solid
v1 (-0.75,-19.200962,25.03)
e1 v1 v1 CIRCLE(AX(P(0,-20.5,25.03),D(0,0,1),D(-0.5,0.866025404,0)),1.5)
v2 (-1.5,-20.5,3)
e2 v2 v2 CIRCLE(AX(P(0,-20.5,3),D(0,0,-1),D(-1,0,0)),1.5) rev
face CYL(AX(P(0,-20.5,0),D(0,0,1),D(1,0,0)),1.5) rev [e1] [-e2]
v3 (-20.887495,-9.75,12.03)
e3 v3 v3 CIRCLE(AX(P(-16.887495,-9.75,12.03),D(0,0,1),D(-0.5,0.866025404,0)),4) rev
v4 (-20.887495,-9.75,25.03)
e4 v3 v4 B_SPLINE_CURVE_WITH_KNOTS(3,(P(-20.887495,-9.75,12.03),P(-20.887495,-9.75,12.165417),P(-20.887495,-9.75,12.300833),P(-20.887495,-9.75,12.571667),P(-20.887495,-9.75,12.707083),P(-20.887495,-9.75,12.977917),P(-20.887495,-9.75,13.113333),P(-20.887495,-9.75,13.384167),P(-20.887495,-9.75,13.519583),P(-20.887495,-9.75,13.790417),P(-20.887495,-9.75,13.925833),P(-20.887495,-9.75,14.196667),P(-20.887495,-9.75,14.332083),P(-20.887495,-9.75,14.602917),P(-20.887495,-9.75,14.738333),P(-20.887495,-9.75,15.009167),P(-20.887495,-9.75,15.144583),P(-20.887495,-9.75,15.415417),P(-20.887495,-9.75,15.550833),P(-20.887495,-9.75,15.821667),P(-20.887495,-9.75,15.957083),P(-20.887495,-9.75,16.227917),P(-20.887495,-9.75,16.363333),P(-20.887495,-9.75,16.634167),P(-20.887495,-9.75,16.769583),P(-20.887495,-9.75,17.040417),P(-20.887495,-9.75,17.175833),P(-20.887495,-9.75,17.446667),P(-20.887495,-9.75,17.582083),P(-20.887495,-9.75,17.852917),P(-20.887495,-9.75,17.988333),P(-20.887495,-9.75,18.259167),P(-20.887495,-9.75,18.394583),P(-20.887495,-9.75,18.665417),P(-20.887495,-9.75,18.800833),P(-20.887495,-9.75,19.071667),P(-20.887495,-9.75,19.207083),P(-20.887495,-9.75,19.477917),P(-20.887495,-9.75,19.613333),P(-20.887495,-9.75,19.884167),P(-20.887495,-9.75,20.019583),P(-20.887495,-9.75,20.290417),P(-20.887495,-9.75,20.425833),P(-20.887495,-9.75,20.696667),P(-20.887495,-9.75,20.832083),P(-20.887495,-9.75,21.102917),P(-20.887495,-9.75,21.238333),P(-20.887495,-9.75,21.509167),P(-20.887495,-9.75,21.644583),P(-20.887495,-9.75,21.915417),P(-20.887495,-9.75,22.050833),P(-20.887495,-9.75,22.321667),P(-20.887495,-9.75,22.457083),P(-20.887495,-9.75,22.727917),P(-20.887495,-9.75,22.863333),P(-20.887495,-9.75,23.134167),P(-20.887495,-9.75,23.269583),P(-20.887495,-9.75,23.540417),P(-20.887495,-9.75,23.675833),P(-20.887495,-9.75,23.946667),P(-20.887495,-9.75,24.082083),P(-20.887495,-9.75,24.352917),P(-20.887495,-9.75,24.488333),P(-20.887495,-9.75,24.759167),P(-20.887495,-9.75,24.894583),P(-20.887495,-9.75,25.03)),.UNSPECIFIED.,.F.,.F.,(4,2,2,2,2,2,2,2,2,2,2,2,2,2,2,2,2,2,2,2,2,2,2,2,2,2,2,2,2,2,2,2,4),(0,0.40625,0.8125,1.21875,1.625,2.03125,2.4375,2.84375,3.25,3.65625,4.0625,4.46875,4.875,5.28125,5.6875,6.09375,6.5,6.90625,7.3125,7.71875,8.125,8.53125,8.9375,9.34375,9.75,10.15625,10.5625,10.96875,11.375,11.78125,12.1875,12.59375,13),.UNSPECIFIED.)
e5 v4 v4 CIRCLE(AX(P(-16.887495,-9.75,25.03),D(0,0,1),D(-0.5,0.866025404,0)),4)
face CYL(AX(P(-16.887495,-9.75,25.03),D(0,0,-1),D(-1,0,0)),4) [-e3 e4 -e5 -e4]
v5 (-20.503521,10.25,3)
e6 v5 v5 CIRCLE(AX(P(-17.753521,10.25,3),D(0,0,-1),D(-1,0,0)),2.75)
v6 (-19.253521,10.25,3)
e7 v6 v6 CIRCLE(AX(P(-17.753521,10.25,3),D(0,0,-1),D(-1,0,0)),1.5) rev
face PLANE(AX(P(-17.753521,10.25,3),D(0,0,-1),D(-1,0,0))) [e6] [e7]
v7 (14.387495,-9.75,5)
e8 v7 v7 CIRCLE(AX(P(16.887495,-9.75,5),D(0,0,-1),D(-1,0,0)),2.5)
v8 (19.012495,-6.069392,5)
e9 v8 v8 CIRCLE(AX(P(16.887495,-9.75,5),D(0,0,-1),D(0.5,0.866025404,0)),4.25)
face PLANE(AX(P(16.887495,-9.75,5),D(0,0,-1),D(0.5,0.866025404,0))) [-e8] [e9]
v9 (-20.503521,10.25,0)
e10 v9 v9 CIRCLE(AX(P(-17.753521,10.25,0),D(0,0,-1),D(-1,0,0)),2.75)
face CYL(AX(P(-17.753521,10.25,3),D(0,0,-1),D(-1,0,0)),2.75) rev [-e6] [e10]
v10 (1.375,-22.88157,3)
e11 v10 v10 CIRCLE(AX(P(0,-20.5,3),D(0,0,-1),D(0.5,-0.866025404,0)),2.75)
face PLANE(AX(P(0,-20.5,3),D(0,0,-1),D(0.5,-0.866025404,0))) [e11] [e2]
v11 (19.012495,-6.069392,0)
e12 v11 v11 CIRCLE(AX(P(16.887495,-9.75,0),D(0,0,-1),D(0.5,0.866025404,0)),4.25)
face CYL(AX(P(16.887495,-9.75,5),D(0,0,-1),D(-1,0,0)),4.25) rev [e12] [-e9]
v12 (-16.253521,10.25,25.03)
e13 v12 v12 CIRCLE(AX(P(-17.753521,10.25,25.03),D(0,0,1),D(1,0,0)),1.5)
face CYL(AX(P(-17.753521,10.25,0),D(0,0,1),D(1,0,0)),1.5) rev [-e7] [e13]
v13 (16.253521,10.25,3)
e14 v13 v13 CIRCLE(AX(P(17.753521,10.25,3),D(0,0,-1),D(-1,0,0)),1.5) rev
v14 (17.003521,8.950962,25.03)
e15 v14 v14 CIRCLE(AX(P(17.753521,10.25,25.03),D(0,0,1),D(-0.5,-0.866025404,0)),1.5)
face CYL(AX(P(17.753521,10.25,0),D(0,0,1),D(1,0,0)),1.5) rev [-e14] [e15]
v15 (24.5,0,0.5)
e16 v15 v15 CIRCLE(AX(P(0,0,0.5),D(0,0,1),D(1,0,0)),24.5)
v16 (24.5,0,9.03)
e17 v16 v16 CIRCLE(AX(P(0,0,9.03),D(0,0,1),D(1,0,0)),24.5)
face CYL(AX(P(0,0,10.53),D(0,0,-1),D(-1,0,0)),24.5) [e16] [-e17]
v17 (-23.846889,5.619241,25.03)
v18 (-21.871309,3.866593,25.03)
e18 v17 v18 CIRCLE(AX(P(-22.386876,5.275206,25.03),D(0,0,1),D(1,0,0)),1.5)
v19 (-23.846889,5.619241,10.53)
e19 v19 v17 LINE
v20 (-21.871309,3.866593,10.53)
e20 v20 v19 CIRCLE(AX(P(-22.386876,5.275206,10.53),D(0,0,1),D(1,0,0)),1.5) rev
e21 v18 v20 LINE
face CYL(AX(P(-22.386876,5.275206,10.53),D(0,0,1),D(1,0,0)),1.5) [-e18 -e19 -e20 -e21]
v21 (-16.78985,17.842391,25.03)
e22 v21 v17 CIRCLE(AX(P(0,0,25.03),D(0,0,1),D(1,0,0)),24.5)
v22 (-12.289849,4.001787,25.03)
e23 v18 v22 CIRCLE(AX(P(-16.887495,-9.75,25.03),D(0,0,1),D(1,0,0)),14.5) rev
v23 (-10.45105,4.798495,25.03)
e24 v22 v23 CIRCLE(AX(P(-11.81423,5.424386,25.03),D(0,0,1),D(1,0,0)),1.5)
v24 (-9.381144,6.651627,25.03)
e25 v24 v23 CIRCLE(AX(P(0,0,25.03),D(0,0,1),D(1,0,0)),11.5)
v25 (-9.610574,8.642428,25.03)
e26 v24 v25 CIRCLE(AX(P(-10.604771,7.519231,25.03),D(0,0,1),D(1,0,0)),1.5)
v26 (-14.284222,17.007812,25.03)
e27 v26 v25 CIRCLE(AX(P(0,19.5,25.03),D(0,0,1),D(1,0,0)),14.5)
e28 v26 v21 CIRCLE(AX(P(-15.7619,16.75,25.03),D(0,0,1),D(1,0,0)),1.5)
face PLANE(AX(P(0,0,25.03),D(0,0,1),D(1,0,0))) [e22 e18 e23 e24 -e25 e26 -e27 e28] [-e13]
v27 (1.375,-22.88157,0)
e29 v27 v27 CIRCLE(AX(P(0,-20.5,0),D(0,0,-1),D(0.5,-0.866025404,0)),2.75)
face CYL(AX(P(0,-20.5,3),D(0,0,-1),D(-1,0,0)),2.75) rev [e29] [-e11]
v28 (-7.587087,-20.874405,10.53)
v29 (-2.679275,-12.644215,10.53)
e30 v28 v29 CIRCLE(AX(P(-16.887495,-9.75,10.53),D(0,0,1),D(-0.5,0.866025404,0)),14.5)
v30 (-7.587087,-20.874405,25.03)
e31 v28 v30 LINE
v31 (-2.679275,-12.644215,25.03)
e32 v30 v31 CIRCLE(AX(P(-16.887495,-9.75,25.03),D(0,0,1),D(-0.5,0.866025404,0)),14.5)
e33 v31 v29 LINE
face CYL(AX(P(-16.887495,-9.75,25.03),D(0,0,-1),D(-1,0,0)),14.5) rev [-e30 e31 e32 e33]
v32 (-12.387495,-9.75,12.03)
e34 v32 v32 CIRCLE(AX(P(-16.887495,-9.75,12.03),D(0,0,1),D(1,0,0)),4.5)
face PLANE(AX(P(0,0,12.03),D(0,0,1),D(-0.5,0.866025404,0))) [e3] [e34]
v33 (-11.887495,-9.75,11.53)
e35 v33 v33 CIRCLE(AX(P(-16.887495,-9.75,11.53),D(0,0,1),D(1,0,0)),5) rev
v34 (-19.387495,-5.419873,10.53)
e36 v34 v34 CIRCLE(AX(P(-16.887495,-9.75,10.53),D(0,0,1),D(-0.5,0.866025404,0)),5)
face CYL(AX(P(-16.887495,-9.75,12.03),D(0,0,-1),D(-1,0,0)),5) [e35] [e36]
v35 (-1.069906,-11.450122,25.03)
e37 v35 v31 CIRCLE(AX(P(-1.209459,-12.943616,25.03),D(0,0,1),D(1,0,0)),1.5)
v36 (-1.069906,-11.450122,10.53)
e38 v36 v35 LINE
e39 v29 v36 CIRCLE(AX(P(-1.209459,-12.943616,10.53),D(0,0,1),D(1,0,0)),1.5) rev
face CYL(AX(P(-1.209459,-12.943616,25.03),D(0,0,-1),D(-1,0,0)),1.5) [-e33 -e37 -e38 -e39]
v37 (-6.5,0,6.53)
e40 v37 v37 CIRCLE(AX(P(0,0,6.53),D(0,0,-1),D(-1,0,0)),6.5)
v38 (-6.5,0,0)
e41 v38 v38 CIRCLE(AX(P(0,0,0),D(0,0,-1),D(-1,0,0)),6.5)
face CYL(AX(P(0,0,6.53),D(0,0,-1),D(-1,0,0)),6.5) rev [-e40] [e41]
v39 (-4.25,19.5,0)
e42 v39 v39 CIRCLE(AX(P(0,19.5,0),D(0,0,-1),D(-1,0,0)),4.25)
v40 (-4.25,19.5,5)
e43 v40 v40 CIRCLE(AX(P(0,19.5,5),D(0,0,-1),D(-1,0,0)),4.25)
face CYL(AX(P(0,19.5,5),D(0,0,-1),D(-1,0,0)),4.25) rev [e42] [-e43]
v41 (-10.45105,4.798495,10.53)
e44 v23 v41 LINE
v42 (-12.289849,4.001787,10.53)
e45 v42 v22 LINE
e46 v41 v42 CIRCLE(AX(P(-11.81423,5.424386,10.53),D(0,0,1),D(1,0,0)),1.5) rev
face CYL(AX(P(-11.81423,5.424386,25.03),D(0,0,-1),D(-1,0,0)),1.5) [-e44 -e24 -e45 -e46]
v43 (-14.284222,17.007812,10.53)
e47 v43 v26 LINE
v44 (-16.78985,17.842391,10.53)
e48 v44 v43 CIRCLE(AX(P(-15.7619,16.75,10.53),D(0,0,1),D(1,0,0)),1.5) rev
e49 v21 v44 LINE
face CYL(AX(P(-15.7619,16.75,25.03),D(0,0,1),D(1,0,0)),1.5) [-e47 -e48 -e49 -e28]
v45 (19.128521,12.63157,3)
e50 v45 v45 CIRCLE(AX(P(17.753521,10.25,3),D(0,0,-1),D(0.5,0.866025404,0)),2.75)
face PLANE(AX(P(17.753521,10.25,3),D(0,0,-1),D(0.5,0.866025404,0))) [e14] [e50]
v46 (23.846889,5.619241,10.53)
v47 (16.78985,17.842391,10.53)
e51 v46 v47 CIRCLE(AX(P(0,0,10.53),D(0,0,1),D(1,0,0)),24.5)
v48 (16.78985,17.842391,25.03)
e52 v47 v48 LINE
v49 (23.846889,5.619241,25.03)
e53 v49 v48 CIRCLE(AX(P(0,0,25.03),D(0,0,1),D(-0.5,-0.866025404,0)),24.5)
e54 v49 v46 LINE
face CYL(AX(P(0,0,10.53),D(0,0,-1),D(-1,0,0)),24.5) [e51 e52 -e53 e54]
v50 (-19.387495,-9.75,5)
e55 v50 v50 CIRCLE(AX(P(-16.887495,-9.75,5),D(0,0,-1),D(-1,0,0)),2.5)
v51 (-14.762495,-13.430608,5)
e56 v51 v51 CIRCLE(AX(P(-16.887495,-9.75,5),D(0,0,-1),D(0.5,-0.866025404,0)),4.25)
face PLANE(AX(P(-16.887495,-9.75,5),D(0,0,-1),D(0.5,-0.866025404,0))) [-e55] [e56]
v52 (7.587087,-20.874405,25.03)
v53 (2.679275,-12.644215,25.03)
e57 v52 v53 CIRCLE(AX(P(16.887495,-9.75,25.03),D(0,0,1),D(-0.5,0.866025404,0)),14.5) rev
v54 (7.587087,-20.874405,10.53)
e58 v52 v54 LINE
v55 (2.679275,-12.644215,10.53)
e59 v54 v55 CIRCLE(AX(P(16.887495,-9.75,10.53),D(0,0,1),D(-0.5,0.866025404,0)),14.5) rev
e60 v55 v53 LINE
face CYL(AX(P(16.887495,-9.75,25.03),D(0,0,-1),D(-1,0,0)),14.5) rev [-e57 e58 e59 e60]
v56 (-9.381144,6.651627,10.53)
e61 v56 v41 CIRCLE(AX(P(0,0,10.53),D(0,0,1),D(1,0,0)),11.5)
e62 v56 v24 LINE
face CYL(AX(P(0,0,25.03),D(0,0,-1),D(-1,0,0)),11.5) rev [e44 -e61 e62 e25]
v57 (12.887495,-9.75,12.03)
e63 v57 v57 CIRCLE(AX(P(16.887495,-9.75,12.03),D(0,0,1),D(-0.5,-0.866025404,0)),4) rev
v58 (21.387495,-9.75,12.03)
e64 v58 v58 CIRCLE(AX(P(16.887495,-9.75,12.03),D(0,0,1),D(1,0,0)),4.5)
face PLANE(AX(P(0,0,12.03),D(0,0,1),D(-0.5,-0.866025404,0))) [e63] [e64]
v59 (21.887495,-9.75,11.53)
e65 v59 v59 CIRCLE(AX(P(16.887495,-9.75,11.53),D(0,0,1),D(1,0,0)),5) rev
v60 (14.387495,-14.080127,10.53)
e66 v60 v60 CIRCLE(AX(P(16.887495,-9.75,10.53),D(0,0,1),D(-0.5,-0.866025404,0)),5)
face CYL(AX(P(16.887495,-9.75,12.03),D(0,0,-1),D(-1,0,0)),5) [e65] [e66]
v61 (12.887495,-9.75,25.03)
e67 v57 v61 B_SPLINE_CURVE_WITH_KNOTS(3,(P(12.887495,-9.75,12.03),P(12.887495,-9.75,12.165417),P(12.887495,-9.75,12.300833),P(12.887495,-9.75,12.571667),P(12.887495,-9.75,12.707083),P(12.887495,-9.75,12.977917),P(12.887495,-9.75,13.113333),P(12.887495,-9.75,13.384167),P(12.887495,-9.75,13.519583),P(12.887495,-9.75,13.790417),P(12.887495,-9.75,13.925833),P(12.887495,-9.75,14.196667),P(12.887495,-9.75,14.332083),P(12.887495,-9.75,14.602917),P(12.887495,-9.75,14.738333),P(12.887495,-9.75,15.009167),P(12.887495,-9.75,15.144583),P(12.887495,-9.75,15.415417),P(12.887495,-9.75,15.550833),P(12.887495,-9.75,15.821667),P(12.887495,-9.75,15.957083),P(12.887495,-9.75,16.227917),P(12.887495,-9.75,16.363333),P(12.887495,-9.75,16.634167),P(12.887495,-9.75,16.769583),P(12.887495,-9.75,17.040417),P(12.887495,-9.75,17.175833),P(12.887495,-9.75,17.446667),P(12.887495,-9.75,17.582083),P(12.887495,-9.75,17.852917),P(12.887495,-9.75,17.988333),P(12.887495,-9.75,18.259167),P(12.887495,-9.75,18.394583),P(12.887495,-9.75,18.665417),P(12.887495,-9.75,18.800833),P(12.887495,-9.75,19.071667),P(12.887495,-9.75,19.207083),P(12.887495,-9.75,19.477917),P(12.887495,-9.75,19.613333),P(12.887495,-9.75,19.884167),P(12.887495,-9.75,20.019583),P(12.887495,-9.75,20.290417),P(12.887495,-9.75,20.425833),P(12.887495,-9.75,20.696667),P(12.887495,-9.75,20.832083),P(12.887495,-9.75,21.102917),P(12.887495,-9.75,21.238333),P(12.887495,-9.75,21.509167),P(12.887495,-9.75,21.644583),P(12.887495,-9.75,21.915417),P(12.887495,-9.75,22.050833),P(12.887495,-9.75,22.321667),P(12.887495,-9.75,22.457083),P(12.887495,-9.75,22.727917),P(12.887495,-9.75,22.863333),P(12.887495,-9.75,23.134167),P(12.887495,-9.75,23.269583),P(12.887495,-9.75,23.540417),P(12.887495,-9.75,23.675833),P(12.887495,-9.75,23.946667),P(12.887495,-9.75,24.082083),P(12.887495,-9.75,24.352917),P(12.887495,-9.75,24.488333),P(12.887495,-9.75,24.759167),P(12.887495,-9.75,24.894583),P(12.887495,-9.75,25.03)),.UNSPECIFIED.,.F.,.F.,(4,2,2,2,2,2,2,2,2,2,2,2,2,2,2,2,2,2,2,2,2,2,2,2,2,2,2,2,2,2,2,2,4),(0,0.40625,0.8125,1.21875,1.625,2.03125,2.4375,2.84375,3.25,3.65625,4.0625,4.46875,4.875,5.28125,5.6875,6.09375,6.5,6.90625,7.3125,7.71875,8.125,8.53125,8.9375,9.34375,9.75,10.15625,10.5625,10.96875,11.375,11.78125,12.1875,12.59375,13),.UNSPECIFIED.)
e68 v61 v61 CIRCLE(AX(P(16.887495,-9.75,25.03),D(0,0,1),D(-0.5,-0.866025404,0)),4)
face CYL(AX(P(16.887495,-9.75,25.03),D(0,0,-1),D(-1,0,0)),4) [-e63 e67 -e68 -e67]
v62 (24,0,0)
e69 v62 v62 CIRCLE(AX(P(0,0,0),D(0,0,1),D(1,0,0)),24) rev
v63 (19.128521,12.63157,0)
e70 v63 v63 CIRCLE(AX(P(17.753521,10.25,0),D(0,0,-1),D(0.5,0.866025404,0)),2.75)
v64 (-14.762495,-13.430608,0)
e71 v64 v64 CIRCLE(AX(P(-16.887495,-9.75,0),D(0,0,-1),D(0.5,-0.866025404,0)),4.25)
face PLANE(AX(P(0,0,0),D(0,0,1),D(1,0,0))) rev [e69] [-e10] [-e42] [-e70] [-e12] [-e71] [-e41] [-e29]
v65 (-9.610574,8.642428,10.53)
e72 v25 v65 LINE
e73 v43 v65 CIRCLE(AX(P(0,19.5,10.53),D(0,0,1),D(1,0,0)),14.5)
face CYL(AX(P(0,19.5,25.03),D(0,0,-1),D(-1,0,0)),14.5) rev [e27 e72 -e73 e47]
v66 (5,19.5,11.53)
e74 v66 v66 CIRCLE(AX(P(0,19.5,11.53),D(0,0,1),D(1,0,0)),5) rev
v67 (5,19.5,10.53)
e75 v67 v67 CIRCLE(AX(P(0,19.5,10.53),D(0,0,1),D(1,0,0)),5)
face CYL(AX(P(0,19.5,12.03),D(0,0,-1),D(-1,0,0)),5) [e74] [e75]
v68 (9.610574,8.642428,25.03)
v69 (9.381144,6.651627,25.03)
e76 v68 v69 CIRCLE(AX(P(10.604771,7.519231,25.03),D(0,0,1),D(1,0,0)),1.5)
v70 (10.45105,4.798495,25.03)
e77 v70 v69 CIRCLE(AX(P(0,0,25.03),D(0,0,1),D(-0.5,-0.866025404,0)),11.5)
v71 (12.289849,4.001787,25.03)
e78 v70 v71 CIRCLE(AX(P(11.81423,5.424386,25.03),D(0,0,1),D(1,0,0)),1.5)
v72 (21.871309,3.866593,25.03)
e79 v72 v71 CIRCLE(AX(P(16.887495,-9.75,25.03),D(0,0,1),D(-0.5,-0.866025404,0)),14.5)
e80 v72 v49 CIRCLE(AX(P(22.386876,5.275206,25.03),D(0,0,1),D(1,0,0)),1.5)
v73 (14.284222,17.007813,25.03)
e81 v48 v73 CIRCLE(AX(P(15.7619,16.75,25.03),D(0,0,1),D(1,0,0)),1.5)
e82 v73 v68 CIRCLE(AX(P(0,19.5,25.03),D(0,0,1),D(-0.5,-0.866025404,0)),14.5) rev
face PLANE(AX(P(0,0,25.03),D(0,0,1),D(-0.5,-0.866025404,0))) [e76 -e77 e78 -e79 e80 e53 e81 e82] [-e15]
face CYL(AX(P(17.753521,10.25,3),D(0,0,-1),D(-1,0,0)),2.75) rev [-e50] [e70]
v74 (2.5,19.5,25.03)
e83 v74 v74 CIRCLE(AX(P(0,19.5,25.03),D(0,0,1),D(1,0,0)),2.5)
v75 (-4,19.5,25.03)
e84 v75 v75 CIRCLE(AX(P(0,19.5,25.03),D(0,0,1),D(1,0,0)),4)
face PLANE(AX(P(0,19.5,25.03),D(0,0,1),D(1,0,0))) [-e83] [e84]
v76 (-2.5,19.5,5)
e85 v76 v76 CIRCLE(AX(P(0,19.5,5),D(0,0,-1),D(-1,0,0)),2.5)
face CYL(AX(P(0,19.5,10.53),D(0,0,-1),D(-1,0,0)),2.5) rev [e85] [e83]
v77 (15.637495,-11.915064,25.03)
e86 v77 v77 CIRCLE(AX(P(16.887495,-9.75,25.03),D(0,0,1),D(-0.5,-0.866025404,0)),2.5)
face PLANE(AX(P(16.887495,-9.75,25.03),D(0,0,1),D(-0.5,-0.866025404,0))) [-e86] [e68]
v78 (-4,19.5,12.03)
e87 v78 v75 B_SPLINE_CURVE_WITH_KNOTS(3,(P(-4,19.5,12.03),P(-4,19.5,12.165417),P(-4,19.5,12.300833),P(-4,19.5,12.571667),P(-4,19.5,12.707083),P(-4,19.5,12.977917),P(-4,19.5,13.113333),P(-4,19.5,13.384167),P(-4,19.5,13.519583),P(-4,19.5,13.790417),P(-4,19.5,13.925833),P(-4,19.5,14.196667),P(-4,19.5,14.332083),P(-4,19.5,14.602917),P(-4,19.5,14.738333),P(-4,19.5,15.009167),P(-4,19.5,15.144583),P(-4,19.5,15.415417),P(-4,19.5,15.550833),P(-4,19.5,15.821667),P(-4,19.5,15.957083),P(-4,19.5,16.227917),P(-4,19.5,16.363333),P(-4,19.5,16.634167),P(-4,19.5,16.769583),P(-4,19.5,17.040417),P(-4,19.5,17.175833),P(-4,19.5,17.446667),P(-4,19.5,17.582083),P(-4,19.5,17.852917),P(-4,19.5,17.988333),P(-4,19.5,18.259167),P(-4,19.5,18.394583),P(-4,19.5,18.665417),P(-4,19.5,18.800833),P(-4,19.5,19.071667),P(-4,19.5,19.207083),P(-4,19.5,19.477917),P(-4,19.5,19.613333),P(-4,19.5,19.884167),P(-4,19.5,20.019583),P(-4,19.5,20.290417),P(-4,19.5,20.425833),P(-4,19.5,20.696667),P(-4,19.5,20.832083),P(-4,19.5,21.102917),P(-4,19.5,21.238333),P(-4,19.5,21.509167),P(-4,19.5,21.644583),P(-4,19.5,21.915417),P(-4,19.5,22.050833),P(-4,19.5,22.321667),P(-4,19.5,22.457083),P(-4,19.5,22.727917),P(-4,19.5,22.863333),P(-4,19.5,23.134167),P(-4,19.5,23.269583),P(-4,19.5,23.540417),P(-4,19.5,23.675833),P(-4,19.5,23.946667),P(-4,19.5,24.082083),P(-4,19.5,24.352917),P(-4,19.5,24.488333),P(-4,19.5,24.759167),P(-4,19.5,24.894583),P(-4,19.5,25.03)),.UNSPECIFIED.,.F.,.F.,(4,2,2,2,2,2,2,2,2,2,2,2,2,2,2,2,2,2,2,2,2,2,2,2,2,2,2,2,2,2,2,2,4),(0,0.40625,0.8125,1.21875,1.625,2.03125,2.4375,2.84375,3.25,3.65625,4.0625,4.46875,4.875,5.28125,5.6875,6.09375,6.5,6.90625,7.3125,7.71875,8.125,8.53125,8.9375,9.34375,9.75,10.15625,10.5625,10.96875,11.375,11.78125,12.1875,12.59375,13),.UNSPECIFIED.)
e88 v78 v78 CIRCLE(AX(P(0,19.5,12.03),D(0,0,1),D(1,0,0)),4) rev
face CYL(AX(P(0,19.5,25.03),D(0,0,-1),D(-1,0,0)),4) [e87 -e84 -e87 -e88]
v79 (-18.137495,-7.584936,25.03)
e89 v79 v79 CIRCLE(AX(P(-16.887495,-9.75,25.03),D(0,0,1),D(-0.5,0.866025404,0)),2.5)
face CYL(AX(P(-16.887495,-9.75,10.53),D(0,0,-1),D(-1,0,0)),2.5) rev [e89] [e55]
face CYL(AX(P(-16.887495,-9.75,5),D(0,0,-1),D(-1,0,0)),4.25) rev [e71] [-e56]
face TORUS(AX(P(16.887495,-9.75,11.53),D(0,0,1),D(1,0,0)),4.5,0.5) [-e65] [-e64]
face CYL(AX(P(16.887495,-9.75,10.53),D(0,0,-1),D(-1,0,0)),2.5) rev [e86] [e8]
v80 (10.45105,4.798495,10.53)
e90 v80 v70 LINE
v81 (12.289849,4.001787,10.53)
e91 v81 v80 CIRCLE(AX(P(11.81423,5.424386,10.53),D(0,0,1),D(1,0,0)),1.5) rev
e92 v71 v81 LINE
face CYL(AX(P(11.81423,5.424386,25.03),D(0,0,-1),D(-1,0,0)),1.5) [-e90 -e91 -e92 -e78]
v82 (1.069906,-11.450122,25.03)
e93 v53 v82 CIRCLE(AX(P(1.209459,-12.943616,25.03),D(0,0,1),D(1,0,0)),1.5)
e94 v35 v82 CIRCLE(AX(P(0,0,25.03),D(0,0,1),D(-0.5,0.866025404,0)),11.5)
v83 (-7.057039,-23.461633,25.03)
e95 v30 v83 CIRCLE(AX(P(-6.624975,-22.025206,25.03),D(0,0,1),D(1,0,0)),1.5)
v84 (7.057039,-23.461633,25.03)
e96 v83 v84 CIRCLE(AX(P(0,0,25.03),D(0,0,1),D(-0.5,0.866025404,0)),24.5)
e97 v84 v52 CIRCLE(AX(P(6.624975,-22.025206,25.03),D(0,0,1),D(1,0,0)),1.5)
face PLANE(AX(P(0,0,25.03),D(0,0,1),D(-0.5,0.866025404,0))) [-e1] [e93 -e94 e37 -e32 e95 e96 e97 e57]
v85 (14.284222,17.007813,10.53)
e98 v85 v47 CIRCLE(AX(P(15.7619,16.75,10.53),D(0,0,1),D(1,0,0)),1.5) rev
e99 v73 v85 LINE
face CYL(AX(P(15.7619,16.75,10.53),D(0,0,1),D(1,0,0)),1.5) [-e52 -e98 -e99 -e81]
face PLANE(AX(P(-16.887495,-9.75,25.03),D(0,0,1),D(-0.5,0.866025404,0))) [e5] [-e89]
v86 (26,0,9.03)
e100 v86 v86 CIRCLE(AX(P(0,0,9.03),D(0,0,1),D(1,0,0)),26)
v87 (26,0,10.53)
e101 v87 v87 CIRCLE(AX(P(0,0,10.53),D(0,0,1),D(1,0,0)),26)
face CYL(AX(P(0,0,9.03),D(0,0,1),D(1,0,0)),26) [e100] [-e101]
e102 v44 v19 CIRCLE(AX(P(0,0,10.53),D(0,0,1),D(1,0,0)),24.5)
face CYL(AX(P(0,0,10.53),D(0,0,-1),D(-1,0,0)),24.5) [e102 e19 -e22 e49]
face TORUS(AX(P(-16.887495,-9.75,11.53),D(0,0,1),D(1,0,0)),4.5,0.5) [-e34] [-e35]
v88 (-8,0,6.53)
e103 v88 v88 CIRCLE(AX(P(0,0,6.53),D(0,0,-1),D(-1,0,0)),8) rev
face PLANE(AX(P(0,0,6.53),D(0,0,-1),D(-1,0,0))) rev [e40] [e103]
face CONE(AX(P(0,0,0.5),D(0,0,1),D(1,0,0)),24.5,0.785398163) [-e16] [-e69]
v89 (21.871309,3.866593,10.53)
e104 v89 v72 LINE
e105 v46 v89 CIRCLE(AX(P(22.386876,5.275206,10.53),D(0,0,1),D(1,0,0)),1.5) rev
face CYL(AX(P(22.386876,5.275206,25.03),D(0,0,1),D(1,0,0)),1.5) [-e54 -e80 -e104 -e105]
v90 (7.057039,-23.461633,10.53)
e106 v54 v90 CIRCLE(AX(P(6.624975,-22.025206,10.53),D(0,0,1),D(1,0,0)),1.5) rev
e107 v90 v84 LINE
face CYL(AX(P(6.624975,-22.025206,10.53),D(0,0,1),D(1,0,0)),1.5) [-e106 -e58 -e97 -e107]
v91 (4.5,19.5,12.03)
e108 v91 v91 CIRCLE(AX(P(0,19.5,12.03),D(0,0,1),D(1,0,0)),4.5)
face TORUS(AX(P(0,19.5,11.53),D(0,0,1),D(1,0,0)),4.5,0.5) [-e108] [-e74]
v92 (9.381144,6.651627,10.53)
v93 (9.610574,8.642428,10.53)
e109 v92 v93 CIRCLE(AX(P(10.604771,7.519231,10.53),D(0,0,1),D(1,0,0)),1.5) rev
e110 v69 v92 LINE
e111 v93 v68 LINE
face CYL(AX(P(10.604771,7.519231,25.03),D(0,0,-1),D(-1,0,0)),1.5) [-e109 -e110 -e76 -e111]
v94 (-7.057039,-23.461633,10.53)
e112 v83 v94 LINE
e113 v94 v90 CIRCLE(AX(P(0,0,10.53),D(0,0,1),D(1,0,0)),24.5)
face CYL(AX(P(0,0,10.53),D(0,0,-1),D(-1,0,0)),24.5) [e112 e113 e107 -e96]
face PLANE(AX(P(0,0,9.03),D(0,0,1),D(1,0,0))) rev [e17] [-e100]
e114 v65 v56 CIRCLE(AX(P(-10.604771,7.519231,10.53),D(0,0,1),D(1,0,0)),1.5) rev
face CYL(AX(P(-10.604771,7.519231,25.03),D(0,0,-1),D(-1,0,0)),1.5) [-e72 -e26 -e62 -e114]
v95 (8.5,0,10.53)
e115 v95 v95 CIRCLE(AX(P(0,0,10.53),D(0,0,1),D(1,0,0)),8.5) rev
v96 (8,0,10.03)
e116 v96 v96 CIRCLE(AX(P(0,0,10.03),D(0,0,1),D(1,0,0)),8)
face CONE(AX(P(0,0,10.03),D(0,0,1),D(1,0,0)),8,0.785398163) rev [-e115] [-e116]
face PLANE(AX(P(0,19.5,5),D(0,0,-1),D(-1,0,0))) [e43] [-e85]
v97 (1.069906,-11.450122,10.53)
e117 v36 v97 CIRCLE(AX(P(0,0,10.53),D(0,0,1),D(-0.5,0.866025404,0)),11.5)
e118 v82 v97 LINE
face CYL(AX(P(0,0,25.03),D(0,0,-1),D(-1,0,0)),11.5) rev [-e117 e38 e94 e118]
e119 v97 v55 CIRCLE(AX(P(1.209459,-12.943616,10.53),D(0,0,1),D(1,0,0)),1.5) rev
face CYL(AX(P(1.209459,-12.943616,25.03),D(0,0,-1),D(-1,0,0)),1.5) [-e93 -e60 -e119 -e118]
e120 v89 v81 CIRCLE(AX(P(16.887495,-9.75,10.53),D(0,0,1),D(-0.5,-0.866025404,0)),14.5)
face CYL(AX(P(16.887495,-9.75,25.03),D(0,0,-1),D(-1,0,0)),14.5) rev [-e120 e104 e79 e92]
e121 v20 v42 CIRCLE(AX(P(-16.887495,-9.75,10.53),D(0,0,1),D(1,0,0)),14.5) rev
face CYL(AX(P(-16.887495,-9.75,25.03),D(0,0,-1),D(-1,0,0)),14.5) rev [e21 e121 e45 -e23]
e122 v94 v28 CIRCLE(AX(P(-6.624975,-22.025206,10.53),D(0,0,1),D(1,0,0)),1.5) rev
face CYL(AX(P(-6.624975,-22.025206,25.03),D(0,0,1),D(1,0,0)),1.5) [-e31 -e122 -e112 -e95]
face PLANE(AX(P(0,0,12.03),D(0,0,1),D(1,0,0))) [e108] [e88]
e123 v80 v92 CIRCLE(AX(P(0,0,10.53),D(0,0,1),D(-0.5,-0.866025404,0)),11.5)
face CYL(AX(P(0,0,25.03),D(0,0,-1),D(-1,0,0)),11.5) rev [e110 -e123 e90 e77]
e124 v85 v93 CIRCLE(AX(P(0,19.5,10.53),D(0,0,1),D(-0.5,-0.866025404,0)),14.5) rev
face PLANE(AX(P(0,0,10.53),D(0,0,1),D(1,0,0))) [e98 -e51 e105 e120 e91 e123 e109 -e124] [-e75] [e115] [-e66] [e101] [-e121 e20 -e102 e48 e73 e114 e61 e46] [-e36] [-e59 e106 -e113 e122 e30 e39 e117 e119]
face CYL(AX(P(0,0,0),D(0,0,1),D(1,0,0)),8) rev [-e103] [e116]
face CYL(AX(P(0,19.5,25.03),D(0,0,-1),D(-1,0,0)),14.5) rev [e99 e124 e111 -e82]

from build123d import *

# Parameters (mm, degrees)
SKETCH1_R           = 24.5
SKETCH1_R_2         = 2.4999999999999996
SKETCH1_R_3         = 2.499999999999988
SKETCH1_R_4         = 2.5000000000000018
BOSS_EXTRUDE1_DEPTH = 10.530000000000001
SKETCH2_R           = 4
SKETCH2_R_2         = 2.4999999999999996
BOSS_EXTRUDE2_DEPTH = 14.5
SKETCH3_R           = 5
SKETCH3_R_2         = 4
BOSS_EXTRUDE3_DEPTH = 1.5
BOSS_EXTRUDE4_DEPTH = 14.5
FILLET2_R           = 0.5
FILLET5_R           = 1.5
CIRPATTERN1_START   = 10.53
CIRPATTERN1_DEPTH   = 14.5
SKETCH5_R           = 1.5000000000000442
CUT_EXTRUDE1_DEPTH  = 43.74343124745603
SKETCH6_R           = 2.7499999999999947
CUT_EXTRUDE2_DEPTH  = 3
SKETCH7_R           = 4.25
CUT_EXTRUDE3_DEPTH  = 5
CIRPATTERN2_COUNT   = 3
CHAMFER1_SIZE       = 0.5
SKETCH9_R           = 8
CUT_EXTRUDE4_DEPTH  = 38.559952245709795
BOSS_EXTRUDE7_START = -6.530000000000001
SKETCH10_R          = 8
SKETCH10_R_2        = 6.500000000000002
BOSS_EXTRUDE7_DEPTH = 6.530000000000001
CHAMFER2_SIZE       = 0.5
BOSS_EXTRUDE8_START = -1.5
SKETCH11_R          = 26.000000000000007
SKETCH11_R_2        = 24.5
BOSS_EXTRUDE8_DEPTH = 1.5


# Read off the part's stored shape, not the designer's step: CirPattern1
with BuildPart() as part:
    # Sketch1 → Boss-Extrude1 (new body)
    with BuildSketch(Plane.XY):
        Circle(SKETCH1_R)
        with Locations((0, 19.5)):
            Circle(SKETCH1_R_2, mode=Mode.SUBTRACT)
        with Locations((16.887495373796185, -9.750000000000636)):
            Circle(SKETCH1_R_3, mode=Mode.SUBTRACT)
        with Locations((-16.887495373797307, -9.750000000000002)):
            Circle(SKETCH1_R_4, mode=Mode.SUBTRACT)
    extrude(amount=BOSS_EXTRUDE1_DEPTH)

    # Sketch2 → Boss-Extrude2 (add)
    with BuildSketch(Plane.XY.offset(10.530000000000001)):
        with Locations(Location((0, 19.5, 0), (0, 0, 180))):
            Circle(SKETCH2_R)
        with Locations((0, 19.5)):
            Circle(SKETCH2_R_2, mode=Mode.SUBTRACT)
    extrude(amount=BOSS_EXTRUDE2_DEPTH)

    # Sketch3 → Boss-Extrude3 (add)
    with BuildSketch(Plane.XY.offset(10.530000000000001)):
        with Locations(Location((0, 19.5, 0), (0, 0, 90))):
            Circle(SKETCH3_R)
        with Locations(Location((0, 19.5, 0), (0, 0, 180))):
            Circle(SKETCH3_R_2, mode=Mode.SUBTRACT)
    extrude(amount=BOSS_EXTRUDE3_DEPTH)

    # Sketch4 → Boss-Extrude4 (add)
    with BuildSketch(Plane.XY.offset(10.530000000000001)):
        with BuildLine():
            ThreePointArc((-8.496322733983213, 7.75), (-12.968536294458422, 13.01408708204353), (-14.497844667397978, 19.750000000000004))
            ThreePointArc((-14.497844667397978, 19.75), (-21.21762239271878, 12.249999999999943), (-24.352924058441666, 2.6805017820872727))
            ThreePointArc((-24.352924058441673, 2.6805017820872727), (-17.754798167341832, 4.724038339879645), (-10.959858246321023, 3.48303132638066))
            ThreePointArc((-10.959858246321025, 3.483031326380663), (-9.959292143521058, 5.749999999999978), (-8.496322733983213, 7.750000000000001))
        make_face()
    extrude(amount=BOSS_EXTRUDE4_DEPTH)

    # Fillet2
    fillet2_edges = [part.edges().sort_by_distance(p)[0] for p in [
        (-9.2e-16, 14.5, 12.030000000000001),
    ]]
    fillet(fillet2_edges, radius=FILLET2_R)

    # Fillet5
    fillet5_edges = [part.edges().sort_by_distance(p)[0] for p in [
        (-14.49784466739798, 19.75, 17.78),
        (-24.35292405844167, 2.6805017820872727, 17.78),
        (-10.959858246321025, 3.4830313263806616, 17.78),
        (-8.496322733983215, 7.75, 17.78),
    ]]
    fillet(fillet5_edges, radius=FILLET5_R)

    # CirPattern1 outline → CirPattern1 (add)
    with BuildSketch(Plane.XY.offset(CIRPATTERN1_START)):
        with BuildLine():
            ThreePointArc((-1.069906346, -11.450122288), (-2.103251355, -11.738985499), (-2.679275225, -12.644214953))
            ThreePointArc((-2.679275225, -12.644214953), (-4.43366395, -17.176444835), (-7.58708663, -20.874405476))
            ThreePointArc((-7.58708663, -20.874405476), (-8.094453803, -22.326259468), (-7.057038992, -23.461632523))
            ThreePointArc((-7.057038992, -23.461632523), (0, -24.5), (7.057038992, -23.461632523))
            ThreePointArc((7.057038992, -23.461632523), (8.094453803, -22.326259468), (7.58708663, -20.874405476))
            ThreePointArc((7.58708663, -20.874405476), (4.43366395, -17.176444835), (2.679275225, -12.644214953))
            ThreePointArc((2.679275225, -12.644214953), (2.103251355, -11.738985499), (1.069906346, -11.450122288))
            ThreePointArc((1.069906346, -11.450122288), (0, -11.5), (-1.069906346, -11.450122288))
        make_face()
        with BuildLine():
            ThreePointArc((23.846889276, 5.619241219), (21.217622393, 12.25), (16.789850284, 17.842391304))
            ThreePointArc((16.789850284, 17.842391304), (15.28788097, 18.173132357), (14.284222116, 17.0078125))
            ThreePointArc((14.284222116, 17.0078125), (12.658405598, 12.42788803), (9.610573748, 8.642427885))
            ThreePointArc((9.610573748, 8.642427885), (9.11463398, 7.690961853), (9.381143605, 6.651627219))
            ThreePointArc((9.381143605, 6.651627219), (9.959292144, 5.75), (10.451049951, 4.798495069))
            ThreePointArc((10.451049951, 4.798495069), (11.217885334, 4.048023646), (12.289848972, 4.001787068))
            ThreePointArc((12.289848972, 4.001787068), (17.092069548, 4.748556804), (21.871308746, 3.866592976))
            ThreePointArc((21.871308746, 3.866592976), (23.382334773, 4.153127111), (23.846889276, 5.619241219))
        make_face()
    extrude(amount=CIRPATTERN1_DEPTH)

    # CirPattern1 2 outline → CirPattern1 2 (revolve)
    with BuildSketch(Plane(origin=(-16.887495374, -9.75, 0), x_dir=(1, 0, 0), z_dir=(0, -1, 0))):
        with BuildLine():
            Line((4, 25.03), (2.5, 25.03))
            Line((2.5, 25.03), (2.5, 10.53))
            Line((2.5, 10.53), (5, 10.53))
            Line((5, 10.53), (5, 11.53))
            ThreePointArc((5, 11.53), (4.853553391, 11.883553391), (4.5, 12.03))
            Line((4.5, 12.03), (4, 12.03))
            Line((4, 12.03), (4, 25.03))
        make_face()
    revolve(axis=Axis((-16.887495374, -9.75, 0), (0, 0, 1)))

    # CirPattern1 3 outline → CirPattern1 3 (revolve)
    with BuildSketch(Plane(origin=(16.887495374, -9.75, 0), x_dir=(1, 0, 0), z_dir=(0, -1, 0))):
        with BuildLine():
            Line((4, 25.03), (2.5, 25.03))
            Line((2.5, 25.03), (2.5, 10.53))
            Line((2.5, 10.53), (5, 10.53))
            Line((5, 10.53), (5, 11.53))
            ThreePointArc((5, 11.53), (4.853553391, 11.883553391), (4.5, 12.03))
            Line((4.5, 12.03), (4, 12.03))
            Line((4, 12.03), (4, 25.03))
        make_face()
    revolve(axis=Axis((16.887495374, -9.75, 0), (0, 0, 1)))

    # Sketch5 → Cut-Extrude1 (cut, through all)
    with BuildSketch(Plane.XY.offset(25.030000000000005)):
        with Locations((-17.753520777581024, 10.249999999999956)):
            Circle(SKETCH5_R)
    cut_extrude1 = extrude(amount=-CUT_EXTRUDE1_DEPTH, mode=Mode.SUBTRACT)

    # Sketch6 → Cut-Extrude2 (cut)
    with BuildSketch(Plane(origin=(0, 0, 0), x_dir=(-1, 0, 0), z_dir=(0, 0, -1))):
        with Locations((17.753520777581024, 10.249999999999956)):
            Circle(SKETCH6_R)
    cut_extrude2 = extrude(amount=-CUT_EXTRUDE2_DEPTH, mode=Mode.SUBTRACT)

    # Sketch7 → Cut-Extrude3 (cut)
    with BuildSketch(Plane(origin=(0, 0, 0), x_dir=(-1, 0, 0), z_dir=(0, 0, -1))):
        with Locations((0, 19.5)):
            Circle(SKETCH7_R)
    cut_extrude3 = extrude(amount=-CUT_EXTRUDE3_DEPTH, mode=Mode.SUBTRACT)

    # CirPattern2: Cut-Extrude1, Cut-Extrude2, Cut-Extrude3 ×3 about axis
    cirpattern2_axis = Axis((1.3e-16, -8.9e-16, 0), (0, 0, 1))
    add([cut_extrude1.rotate(cirpattern2_axis, i * 360 / CIRPATTERN2_COUNT) for i in range(1, CIRPATTERN2_COUNT)], mode=Mode.SUBTRACT)
    add([cut_extrude2.rotate(cirpattern2_axis, i * 360 / CIRPATTERN2_COUNT) for i in range(1, CIRPATTERN2_COUNT)], mode=Mode.SUBTRACT)
    add([cut_extrude3.rotate(cirpattern2_axis, i * 360 / CIRPATTERN2_COUNT) for i in range(1, CIRPATTERN2_COUNT)], mode=Mode.SUBTRACT)

    # Chamfer1
    chamfer1_edges = [part.edges().sort_by_distance(p)[0] for p in [
        (-24.5, 3e-15, 0),
    ]]
    chamfer(chamfer1_edges, length=CHAMFER1_SIZE)

    # Sketch9 → Cut-Extrude4 (cut, through all)
    with BuildSketch(Plane.XY.offset(10.530000000000001)):
        Circle(SKETCH9_R)
    extrude(amount=-CUT_EXTRUDE4_DEPTH, mode=Mode.SUBTRACT)

    # Sketch10 → Boss-Extrude7 (add)
    with BuildSketch(Plane(origin=(0, 0, 0), x_dir=(-1, 0, 0), z_dir=(0, 0, -1)).offset(BOSS_EXTRUDE7_START)):
        with Locations(Location((0, 0, 0), (0, 0, 180))):
            Circle(SKETCH10_R)
        Circle(SKETCH10_R_2, mode=Mode.SUBTRACT)
    extrude(amount=BOSS_EXTRUDE7_DEPTH)

    # Chamfer2
    chamfer2_edges = [part.edges().sort_by_distance(p)[0] for p in [
        (-8, 9.8e-16, 10.530000000000001),
    ]]
    chamfer(chamfer2_edges, length=CHAMFER2_SIZE)

    # Sketch11 → Boss-Extrude8 (add)
    with BuildSketch(Plane.XY.offset(10.530000000000001).offset(BOSS_EXTRUDE8_START)):
        Circle(SKETCH11_R)
        Circle(SKETCH11_R_2, mode=Mode.SUBTRACT)
    extrude(amount=BOSS_EXTRUDE8_DEPTH)


solid = part.part
